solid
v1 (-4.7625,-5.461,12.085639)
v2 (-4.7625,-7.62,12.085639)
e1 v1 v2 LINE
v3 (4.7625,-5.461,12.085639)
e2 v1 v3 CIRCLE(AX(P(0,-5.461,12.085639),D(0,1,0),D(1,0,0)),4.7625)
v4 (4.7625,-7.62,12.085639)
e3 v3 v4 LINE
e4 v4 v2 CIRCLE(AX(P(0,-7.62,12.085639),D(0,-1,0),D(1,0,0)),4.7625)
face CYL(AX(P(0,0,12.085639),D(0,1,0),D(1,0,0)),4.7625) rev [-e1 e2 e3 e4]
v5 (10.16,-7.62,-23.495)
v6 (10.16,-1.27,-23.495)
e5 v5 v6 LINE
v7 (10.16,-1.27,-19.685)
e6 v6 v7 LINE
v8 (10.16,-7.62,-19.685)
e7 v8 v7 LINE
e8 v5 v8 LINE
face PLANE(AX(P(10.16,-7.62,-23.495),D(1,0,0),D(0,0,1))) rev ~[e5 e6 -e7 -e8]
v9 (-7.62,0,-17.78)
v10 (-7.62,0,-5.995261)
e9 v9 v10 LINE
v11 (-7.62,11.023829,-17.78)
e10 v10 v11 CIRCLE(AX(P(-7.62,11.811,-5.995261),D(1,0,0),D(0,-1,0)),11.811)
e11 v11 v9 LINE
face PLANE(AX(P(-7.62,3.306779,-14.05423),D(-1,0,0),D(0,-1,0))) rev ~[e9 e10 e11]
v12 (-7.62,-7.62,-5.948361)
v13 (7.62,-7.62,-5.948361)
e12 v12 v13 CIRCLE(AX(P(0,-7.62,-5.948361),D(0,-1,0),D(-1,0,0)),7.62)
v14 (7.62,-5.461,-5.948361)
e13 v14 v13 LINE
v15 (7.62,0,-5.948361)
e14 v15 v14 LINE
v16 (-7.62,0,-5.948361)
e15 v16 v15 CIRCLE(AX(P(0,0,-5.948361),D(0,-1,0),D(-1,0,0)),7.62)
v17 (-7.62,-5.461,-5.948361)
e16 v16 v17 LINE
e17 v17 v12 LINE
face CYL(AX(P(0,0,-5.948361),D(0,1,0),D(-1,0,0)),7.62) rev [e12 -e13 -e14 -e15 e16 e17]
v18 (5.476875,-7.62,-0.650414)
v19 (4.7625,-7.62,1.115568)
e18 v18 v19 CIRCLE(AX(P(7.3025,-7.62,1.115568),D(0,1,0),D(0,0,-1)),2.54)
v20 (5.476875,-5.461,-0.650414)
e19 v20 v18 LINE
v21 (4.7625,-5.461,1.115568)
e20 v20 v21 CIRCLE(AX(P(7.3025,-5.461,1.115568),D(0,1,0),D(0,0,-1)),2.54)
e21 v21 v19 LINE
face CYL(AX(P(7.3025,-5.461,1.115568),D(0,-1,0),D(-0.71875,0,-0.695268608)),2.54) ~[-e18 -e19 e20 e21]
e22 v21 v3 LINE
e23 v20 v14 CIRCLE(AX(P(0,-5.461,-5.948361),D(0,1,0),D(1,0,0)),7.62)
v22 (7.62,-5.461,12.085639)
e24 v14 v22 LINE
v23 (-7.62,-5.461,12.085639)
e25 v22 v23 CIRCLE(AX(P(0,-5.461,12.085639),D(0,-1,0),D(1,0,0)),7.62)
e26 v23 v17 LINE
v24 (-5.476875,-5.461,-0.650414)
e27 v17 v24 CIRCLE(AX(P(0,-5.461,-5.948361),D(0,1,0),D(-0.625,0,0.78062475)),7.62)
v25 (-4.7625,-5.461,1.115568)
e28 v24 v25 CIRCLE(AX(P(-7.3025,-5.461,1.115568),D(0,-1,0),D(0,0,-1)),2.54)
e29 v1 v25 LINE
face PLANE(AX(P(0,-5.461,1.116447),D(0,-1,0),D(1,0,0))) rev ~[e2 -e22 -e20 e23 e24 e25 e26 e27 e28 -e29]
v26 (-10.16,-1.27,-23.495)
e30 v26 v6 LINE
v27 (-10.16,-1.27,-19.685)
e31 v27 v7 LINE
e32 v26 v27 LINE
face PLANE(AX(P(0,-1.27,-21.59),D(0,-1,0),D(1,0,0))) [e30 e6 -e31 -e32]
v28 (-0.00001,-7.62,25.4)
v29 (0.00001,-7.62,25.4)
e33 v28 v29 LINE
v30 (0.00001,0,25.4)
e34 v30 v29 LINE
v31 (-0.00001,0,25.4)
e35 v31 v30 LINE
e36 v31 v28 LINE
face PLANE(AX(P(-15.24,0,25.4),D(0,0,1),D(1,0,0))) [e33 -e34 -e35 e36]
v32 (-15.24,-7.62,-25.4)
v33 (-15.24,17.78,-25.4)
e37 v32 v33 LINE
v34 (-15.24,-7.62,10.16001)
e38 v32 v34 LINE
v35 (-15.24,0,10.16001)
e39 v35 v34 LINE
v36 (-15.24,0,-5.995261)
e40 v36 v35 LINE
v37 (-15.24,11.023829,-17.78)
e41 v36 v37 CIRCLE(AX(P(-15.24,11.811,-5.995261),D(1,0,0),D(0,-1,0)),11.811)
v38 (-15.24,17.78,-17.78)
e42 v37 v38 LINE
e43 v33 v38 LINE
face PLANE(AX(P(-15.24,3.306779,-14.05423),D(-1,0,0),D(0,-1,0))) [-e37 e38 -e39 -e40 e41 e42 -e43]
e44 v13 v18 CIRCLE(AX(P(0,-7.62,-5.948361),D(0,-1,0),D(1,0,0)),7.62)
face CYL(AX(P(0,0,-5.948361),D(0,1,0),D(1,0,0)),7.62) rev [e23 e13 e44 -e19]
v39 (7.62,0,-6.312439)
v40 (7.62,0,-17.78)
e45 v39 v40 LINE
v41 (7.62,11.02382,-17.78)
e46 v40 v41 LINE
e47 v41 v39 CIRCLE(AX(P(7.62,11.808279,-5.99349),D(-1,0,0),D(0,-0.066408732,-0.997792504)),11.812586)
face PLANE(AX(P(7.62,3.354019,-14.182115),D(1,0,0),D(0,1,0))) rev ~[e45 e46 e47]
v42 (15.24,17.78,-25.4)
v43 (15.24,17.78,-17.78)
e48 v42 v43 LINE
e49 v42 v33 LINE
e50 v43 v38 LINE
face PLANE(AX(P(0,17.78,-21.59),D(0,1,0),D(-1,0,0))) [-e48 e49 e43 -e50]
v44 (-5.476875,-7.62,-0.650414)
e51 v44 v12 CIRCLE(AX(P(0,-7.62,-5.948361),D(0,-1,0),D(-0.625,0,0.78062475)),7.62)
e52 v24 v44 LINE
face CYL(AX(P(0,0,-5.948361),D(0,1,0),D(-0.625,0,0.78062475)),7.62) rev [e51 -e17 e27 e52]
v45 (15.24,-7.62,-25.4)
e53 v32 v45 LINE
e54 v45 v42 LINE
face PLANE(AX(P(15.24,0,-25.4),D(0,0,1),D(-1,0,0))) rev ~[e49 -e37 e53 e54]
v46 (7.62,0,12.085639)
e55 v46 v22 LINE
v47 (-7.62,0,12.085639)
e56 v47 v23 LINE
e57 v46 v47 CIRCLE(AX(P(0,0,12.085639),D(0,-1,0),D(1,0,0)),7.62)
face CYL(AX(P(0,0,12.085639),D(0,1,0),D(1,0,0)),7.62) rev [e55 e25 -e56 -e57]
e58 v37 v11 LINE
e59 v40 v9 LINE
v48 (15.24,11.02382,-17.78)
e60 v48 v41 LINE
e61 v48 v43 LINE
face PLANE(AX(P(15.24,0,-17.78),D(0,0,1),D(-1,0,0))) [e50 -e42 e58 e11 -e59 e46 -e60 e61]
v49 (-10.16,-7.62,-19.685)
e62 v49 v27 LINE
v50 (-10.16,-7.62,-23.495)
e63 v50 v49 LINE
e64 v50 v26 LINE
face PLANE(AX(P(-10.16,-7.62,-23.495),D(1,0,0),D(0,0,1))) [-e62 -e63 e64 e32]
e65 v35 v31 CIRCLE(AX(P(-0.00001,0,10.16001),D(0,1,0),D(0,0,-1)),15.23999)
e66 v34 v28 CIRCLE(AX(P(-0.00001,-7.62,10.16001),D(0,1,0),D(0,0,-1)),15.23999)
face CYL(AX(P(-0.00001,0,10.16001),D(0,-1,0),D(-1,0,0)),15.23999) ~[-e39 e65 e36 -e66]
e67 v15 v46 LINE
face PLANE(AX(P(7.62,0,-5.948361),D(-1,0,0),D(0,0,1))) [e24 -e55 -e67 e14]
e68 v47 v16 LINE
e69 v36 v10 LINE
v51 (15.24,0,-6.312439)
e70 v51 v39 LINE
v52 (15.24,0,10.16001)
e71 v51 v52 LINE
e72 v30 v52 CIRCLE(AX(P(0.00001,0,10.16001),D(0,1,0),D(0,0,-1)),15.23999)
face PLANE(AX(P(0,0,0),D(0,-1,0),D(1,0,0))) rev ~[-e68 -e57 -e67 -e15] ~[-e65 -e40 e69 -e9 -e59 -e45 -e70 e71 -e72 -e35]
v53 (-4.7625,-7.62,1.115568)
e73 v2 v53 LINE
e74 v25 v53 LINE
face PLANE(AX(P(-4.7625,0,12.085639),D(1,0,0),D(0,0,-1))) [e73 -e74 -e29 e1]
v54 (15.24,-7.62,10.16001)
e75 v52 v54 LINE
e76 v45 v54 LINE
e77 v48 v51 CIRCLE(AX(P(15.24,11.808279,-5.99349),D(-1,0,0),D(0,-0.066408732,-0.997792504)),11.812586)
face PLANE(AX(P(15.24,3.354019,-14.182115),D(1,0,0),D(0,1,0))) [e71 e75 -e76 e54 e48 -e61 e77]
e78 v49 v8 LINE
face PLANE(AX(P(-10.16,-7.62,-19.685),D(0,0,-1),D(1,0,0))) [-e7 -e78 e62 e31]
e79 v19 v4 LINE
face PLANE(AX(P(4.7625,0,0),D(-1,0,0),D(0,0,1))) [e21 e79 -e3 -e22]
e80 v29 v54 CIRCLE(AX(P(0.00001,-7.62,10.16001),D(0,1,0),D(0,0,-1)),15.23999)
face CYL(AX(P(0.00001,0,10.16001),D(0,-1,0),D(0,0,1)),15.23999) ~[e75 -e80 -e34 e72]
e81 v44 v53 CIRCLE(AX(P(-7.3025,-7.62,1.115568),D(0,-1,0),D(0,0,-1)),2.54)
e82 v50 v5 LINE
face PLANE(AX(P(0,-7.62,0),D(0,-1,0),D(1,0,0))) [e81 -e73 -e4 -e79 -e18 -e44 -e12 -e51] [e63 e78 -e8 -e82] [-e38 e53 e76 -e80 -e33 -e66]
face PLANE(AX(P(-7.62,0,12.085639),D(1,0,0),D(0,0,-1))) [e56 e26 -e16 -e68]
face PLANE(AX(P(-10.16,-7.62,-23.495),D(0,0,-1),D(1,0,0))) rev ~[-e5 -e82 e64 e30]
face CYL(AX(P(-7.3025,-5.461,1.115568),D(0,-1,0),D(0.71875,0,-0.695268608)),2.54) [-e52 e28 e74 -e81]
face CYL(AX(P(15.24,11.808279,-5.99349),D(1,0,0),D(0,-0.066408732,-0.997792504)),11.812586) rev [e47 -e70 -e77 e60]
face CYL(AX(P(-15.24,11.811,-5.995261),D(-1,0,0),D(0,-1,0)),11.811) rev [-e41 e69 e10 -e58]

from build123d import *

# Parameters (mm, degrees)
F0_W      = 30.48
F0_H      = 50.8
F2_DEPTH  = 7.62
F3_DEPTH  = 7.62
F4_DEPTH  = 5.461
F5_W      = 30.48
F5_H      = 7.62
F6_DEPTH  = 17.78
F8_DEPTH  = 7.62
F10_DEPTH = 7.62
F11_W     = 20.32
F11_H     = 3.81
F12_DEPTH = 6.35
F13_R     = 15.23999
F14_R     = 2.54


# Not quite as in the source:
# - a fillet or chamfer is up to 0.001 mm smaller than in the source, because OpenCascade refuses the exact size


with BuildPart() as f2:
    # F0 (on Front) → F2 (new body)
    with BuildSketch(Plane.XZ):
        Rectangle(F0_W, F0_H)
    extrude(amount=F2_DEPTH)

    # F1 (on face) → F3 (cut)
    with BuildSketch(Plane.XZ):
        with BuildLine():
            Line((4.7625, 0), (4.7625, 12.0856394065))
            ThreePointArc((4.7625, 12.0856394065), (0, 16.8481394065), (-4.7625, 12.0856394065))
            Line((-4.7625, 12.0856394065), (-4.7625, 0))
            ThreePointArc((-4.7625, 0), (-6.8685751798, -2.6488038051), (-7.62, -5.9483605935))
            ThreePointArc((-7.62, -5.9483605935), (0, -13.5683605935), (7.62, -5.9483605935))
            ThreePointArc((7.62, -5.9483605935), (6.8685751798, -2.6488038051), (4.7625, 0))
        make_face()
    extrude(amount=F3_DEPTH, mode=Mode.SUBTRACT)

    # F1 (on face) → F4 (cut)
    with BuildSketch(Plane.XZ):
        with BuildLine():
            Line((4.7625, 0), (4.7625, 12.0856394065))
            ThreePointArc((4.7625, 12.0856394065), (0, 16.8481394065), (-4.7625, 12.0856394065))
            Line((-4.7625, 12.0856394065), (-4.7625, 0))
            ThreePointArc((-4.7625, 0), (-6.8685751798, -2.6488038051), (-7.62, -5.9483605935))
            ThreePointArc((-7.62, -5.9483605935), (0, -13.5683605935), (7.62, -5.9483605935))
            ThreePointArc((7.62, -5.9483605935), (6.8685751798, -2.6488038051), (4.7625, 0))
        make_face()
        with BuildLine():
            ThreePointArc((-4.7625, 12.0856394065), (0, 16.8481394065), (4.7625, 12.0856394065))
            Line((4.7625, 12.0856394065), (4.7625, 0))
            ThreePointArc((4.7625, 0), (6.8685751798, -2.6488038051), (7.62, -5.9483605935))
            Line((7.62, -5.9483605935), (7.62, 12.0856394065))
            ThreePointArc((7.62, 12.0856394065), (0, 19.7056394065), (-7.62, 12.0856394065))
            Line((-7.62, 12.0856394065), (-7.62, -5.9483605935))
            ThreePointArc((-7.62, -5.9483605935), (-6.8685751798, -2.6488038051), (-4.7625, 0))
            Line((-4.7625, 0), (-4.7625, 12.0856394065))
        make_face()
    extrude(amount=F4_DEPTH, mode=Mode.SUBTRACT)

    # F5 (on face) → F6 (join)
    with BuildSketch(Plane(origin=(0, 0, 0), x_dir=(-1, 0, 0), z_dir=(0, 1, 0))):
        with Locations((0, -21.59)):
            Rectangle(F5_W, F5_H)
    extrude(amount=F6_DEPTH)

    # F7 (on face) → F8 (join)
    with BuildSketch(Plane.YZ.offset(15.24)):
        with BuildLine():
            ThreePointArc((11.0238203779, -17.78), (3.2923822905, -14.1798622678), (0, -6.3124392182))
            Line((0, -6.3124392182), (0, -17.78))
            Line((0, -17.78), (11.0238203779, -17.78))
        make_face()
    extrude(amount=-F8_DEPTH)

    # F9 (on face) → F10 (join)
    with BuildSketch(Plane(origin=(-15.24, 0, 0), x_dir=(0, -1, 0), z_dir=(-1, 0, 0))):
        with BuildLine():
            Line((-11.0238286, -17.78), (0, -17.78))
            Line((0, -17.78), (0, -5.9952606229))
            ThreePointArc((0, -5.9952606229), (-3.1855434206, -14.0637933146), (-11.0238286, -17.78))
        make_face()
    extrude(amount=-F10_DEPTH)

    # F11 (on face) → F12 (cut)
    with BuildSketch(Plane.XZ.offset(7.62)):
        with Locations((0, -21.59)):
            Rectangle(F11_W, F11_H)
    extrude(amount=-F12_DEPTH, mode=Mode.SUBTRACT)

    # F13 (radius 15.24 in the source; OpenCascade refuses exactly that, so slightly less here)
    f13_edges = [f2.edges().sort_by_distance(p)[0] for p in [
        (15.24, -3.81, 25.4),
        (-15.24, -3.81, 25.4),
    ]]
    fillet(f13_edges, radius=F13_R)

    # F14
    f14_edges = [f2.edges().sort_by_distance(p)[0] for p in [
        (4.7625, -6.5405, 0),
        (-4.7625, -6.5405, 0),
    ]]
    fillet(f14_edges, radius=F14_R)


solid = f2.part
